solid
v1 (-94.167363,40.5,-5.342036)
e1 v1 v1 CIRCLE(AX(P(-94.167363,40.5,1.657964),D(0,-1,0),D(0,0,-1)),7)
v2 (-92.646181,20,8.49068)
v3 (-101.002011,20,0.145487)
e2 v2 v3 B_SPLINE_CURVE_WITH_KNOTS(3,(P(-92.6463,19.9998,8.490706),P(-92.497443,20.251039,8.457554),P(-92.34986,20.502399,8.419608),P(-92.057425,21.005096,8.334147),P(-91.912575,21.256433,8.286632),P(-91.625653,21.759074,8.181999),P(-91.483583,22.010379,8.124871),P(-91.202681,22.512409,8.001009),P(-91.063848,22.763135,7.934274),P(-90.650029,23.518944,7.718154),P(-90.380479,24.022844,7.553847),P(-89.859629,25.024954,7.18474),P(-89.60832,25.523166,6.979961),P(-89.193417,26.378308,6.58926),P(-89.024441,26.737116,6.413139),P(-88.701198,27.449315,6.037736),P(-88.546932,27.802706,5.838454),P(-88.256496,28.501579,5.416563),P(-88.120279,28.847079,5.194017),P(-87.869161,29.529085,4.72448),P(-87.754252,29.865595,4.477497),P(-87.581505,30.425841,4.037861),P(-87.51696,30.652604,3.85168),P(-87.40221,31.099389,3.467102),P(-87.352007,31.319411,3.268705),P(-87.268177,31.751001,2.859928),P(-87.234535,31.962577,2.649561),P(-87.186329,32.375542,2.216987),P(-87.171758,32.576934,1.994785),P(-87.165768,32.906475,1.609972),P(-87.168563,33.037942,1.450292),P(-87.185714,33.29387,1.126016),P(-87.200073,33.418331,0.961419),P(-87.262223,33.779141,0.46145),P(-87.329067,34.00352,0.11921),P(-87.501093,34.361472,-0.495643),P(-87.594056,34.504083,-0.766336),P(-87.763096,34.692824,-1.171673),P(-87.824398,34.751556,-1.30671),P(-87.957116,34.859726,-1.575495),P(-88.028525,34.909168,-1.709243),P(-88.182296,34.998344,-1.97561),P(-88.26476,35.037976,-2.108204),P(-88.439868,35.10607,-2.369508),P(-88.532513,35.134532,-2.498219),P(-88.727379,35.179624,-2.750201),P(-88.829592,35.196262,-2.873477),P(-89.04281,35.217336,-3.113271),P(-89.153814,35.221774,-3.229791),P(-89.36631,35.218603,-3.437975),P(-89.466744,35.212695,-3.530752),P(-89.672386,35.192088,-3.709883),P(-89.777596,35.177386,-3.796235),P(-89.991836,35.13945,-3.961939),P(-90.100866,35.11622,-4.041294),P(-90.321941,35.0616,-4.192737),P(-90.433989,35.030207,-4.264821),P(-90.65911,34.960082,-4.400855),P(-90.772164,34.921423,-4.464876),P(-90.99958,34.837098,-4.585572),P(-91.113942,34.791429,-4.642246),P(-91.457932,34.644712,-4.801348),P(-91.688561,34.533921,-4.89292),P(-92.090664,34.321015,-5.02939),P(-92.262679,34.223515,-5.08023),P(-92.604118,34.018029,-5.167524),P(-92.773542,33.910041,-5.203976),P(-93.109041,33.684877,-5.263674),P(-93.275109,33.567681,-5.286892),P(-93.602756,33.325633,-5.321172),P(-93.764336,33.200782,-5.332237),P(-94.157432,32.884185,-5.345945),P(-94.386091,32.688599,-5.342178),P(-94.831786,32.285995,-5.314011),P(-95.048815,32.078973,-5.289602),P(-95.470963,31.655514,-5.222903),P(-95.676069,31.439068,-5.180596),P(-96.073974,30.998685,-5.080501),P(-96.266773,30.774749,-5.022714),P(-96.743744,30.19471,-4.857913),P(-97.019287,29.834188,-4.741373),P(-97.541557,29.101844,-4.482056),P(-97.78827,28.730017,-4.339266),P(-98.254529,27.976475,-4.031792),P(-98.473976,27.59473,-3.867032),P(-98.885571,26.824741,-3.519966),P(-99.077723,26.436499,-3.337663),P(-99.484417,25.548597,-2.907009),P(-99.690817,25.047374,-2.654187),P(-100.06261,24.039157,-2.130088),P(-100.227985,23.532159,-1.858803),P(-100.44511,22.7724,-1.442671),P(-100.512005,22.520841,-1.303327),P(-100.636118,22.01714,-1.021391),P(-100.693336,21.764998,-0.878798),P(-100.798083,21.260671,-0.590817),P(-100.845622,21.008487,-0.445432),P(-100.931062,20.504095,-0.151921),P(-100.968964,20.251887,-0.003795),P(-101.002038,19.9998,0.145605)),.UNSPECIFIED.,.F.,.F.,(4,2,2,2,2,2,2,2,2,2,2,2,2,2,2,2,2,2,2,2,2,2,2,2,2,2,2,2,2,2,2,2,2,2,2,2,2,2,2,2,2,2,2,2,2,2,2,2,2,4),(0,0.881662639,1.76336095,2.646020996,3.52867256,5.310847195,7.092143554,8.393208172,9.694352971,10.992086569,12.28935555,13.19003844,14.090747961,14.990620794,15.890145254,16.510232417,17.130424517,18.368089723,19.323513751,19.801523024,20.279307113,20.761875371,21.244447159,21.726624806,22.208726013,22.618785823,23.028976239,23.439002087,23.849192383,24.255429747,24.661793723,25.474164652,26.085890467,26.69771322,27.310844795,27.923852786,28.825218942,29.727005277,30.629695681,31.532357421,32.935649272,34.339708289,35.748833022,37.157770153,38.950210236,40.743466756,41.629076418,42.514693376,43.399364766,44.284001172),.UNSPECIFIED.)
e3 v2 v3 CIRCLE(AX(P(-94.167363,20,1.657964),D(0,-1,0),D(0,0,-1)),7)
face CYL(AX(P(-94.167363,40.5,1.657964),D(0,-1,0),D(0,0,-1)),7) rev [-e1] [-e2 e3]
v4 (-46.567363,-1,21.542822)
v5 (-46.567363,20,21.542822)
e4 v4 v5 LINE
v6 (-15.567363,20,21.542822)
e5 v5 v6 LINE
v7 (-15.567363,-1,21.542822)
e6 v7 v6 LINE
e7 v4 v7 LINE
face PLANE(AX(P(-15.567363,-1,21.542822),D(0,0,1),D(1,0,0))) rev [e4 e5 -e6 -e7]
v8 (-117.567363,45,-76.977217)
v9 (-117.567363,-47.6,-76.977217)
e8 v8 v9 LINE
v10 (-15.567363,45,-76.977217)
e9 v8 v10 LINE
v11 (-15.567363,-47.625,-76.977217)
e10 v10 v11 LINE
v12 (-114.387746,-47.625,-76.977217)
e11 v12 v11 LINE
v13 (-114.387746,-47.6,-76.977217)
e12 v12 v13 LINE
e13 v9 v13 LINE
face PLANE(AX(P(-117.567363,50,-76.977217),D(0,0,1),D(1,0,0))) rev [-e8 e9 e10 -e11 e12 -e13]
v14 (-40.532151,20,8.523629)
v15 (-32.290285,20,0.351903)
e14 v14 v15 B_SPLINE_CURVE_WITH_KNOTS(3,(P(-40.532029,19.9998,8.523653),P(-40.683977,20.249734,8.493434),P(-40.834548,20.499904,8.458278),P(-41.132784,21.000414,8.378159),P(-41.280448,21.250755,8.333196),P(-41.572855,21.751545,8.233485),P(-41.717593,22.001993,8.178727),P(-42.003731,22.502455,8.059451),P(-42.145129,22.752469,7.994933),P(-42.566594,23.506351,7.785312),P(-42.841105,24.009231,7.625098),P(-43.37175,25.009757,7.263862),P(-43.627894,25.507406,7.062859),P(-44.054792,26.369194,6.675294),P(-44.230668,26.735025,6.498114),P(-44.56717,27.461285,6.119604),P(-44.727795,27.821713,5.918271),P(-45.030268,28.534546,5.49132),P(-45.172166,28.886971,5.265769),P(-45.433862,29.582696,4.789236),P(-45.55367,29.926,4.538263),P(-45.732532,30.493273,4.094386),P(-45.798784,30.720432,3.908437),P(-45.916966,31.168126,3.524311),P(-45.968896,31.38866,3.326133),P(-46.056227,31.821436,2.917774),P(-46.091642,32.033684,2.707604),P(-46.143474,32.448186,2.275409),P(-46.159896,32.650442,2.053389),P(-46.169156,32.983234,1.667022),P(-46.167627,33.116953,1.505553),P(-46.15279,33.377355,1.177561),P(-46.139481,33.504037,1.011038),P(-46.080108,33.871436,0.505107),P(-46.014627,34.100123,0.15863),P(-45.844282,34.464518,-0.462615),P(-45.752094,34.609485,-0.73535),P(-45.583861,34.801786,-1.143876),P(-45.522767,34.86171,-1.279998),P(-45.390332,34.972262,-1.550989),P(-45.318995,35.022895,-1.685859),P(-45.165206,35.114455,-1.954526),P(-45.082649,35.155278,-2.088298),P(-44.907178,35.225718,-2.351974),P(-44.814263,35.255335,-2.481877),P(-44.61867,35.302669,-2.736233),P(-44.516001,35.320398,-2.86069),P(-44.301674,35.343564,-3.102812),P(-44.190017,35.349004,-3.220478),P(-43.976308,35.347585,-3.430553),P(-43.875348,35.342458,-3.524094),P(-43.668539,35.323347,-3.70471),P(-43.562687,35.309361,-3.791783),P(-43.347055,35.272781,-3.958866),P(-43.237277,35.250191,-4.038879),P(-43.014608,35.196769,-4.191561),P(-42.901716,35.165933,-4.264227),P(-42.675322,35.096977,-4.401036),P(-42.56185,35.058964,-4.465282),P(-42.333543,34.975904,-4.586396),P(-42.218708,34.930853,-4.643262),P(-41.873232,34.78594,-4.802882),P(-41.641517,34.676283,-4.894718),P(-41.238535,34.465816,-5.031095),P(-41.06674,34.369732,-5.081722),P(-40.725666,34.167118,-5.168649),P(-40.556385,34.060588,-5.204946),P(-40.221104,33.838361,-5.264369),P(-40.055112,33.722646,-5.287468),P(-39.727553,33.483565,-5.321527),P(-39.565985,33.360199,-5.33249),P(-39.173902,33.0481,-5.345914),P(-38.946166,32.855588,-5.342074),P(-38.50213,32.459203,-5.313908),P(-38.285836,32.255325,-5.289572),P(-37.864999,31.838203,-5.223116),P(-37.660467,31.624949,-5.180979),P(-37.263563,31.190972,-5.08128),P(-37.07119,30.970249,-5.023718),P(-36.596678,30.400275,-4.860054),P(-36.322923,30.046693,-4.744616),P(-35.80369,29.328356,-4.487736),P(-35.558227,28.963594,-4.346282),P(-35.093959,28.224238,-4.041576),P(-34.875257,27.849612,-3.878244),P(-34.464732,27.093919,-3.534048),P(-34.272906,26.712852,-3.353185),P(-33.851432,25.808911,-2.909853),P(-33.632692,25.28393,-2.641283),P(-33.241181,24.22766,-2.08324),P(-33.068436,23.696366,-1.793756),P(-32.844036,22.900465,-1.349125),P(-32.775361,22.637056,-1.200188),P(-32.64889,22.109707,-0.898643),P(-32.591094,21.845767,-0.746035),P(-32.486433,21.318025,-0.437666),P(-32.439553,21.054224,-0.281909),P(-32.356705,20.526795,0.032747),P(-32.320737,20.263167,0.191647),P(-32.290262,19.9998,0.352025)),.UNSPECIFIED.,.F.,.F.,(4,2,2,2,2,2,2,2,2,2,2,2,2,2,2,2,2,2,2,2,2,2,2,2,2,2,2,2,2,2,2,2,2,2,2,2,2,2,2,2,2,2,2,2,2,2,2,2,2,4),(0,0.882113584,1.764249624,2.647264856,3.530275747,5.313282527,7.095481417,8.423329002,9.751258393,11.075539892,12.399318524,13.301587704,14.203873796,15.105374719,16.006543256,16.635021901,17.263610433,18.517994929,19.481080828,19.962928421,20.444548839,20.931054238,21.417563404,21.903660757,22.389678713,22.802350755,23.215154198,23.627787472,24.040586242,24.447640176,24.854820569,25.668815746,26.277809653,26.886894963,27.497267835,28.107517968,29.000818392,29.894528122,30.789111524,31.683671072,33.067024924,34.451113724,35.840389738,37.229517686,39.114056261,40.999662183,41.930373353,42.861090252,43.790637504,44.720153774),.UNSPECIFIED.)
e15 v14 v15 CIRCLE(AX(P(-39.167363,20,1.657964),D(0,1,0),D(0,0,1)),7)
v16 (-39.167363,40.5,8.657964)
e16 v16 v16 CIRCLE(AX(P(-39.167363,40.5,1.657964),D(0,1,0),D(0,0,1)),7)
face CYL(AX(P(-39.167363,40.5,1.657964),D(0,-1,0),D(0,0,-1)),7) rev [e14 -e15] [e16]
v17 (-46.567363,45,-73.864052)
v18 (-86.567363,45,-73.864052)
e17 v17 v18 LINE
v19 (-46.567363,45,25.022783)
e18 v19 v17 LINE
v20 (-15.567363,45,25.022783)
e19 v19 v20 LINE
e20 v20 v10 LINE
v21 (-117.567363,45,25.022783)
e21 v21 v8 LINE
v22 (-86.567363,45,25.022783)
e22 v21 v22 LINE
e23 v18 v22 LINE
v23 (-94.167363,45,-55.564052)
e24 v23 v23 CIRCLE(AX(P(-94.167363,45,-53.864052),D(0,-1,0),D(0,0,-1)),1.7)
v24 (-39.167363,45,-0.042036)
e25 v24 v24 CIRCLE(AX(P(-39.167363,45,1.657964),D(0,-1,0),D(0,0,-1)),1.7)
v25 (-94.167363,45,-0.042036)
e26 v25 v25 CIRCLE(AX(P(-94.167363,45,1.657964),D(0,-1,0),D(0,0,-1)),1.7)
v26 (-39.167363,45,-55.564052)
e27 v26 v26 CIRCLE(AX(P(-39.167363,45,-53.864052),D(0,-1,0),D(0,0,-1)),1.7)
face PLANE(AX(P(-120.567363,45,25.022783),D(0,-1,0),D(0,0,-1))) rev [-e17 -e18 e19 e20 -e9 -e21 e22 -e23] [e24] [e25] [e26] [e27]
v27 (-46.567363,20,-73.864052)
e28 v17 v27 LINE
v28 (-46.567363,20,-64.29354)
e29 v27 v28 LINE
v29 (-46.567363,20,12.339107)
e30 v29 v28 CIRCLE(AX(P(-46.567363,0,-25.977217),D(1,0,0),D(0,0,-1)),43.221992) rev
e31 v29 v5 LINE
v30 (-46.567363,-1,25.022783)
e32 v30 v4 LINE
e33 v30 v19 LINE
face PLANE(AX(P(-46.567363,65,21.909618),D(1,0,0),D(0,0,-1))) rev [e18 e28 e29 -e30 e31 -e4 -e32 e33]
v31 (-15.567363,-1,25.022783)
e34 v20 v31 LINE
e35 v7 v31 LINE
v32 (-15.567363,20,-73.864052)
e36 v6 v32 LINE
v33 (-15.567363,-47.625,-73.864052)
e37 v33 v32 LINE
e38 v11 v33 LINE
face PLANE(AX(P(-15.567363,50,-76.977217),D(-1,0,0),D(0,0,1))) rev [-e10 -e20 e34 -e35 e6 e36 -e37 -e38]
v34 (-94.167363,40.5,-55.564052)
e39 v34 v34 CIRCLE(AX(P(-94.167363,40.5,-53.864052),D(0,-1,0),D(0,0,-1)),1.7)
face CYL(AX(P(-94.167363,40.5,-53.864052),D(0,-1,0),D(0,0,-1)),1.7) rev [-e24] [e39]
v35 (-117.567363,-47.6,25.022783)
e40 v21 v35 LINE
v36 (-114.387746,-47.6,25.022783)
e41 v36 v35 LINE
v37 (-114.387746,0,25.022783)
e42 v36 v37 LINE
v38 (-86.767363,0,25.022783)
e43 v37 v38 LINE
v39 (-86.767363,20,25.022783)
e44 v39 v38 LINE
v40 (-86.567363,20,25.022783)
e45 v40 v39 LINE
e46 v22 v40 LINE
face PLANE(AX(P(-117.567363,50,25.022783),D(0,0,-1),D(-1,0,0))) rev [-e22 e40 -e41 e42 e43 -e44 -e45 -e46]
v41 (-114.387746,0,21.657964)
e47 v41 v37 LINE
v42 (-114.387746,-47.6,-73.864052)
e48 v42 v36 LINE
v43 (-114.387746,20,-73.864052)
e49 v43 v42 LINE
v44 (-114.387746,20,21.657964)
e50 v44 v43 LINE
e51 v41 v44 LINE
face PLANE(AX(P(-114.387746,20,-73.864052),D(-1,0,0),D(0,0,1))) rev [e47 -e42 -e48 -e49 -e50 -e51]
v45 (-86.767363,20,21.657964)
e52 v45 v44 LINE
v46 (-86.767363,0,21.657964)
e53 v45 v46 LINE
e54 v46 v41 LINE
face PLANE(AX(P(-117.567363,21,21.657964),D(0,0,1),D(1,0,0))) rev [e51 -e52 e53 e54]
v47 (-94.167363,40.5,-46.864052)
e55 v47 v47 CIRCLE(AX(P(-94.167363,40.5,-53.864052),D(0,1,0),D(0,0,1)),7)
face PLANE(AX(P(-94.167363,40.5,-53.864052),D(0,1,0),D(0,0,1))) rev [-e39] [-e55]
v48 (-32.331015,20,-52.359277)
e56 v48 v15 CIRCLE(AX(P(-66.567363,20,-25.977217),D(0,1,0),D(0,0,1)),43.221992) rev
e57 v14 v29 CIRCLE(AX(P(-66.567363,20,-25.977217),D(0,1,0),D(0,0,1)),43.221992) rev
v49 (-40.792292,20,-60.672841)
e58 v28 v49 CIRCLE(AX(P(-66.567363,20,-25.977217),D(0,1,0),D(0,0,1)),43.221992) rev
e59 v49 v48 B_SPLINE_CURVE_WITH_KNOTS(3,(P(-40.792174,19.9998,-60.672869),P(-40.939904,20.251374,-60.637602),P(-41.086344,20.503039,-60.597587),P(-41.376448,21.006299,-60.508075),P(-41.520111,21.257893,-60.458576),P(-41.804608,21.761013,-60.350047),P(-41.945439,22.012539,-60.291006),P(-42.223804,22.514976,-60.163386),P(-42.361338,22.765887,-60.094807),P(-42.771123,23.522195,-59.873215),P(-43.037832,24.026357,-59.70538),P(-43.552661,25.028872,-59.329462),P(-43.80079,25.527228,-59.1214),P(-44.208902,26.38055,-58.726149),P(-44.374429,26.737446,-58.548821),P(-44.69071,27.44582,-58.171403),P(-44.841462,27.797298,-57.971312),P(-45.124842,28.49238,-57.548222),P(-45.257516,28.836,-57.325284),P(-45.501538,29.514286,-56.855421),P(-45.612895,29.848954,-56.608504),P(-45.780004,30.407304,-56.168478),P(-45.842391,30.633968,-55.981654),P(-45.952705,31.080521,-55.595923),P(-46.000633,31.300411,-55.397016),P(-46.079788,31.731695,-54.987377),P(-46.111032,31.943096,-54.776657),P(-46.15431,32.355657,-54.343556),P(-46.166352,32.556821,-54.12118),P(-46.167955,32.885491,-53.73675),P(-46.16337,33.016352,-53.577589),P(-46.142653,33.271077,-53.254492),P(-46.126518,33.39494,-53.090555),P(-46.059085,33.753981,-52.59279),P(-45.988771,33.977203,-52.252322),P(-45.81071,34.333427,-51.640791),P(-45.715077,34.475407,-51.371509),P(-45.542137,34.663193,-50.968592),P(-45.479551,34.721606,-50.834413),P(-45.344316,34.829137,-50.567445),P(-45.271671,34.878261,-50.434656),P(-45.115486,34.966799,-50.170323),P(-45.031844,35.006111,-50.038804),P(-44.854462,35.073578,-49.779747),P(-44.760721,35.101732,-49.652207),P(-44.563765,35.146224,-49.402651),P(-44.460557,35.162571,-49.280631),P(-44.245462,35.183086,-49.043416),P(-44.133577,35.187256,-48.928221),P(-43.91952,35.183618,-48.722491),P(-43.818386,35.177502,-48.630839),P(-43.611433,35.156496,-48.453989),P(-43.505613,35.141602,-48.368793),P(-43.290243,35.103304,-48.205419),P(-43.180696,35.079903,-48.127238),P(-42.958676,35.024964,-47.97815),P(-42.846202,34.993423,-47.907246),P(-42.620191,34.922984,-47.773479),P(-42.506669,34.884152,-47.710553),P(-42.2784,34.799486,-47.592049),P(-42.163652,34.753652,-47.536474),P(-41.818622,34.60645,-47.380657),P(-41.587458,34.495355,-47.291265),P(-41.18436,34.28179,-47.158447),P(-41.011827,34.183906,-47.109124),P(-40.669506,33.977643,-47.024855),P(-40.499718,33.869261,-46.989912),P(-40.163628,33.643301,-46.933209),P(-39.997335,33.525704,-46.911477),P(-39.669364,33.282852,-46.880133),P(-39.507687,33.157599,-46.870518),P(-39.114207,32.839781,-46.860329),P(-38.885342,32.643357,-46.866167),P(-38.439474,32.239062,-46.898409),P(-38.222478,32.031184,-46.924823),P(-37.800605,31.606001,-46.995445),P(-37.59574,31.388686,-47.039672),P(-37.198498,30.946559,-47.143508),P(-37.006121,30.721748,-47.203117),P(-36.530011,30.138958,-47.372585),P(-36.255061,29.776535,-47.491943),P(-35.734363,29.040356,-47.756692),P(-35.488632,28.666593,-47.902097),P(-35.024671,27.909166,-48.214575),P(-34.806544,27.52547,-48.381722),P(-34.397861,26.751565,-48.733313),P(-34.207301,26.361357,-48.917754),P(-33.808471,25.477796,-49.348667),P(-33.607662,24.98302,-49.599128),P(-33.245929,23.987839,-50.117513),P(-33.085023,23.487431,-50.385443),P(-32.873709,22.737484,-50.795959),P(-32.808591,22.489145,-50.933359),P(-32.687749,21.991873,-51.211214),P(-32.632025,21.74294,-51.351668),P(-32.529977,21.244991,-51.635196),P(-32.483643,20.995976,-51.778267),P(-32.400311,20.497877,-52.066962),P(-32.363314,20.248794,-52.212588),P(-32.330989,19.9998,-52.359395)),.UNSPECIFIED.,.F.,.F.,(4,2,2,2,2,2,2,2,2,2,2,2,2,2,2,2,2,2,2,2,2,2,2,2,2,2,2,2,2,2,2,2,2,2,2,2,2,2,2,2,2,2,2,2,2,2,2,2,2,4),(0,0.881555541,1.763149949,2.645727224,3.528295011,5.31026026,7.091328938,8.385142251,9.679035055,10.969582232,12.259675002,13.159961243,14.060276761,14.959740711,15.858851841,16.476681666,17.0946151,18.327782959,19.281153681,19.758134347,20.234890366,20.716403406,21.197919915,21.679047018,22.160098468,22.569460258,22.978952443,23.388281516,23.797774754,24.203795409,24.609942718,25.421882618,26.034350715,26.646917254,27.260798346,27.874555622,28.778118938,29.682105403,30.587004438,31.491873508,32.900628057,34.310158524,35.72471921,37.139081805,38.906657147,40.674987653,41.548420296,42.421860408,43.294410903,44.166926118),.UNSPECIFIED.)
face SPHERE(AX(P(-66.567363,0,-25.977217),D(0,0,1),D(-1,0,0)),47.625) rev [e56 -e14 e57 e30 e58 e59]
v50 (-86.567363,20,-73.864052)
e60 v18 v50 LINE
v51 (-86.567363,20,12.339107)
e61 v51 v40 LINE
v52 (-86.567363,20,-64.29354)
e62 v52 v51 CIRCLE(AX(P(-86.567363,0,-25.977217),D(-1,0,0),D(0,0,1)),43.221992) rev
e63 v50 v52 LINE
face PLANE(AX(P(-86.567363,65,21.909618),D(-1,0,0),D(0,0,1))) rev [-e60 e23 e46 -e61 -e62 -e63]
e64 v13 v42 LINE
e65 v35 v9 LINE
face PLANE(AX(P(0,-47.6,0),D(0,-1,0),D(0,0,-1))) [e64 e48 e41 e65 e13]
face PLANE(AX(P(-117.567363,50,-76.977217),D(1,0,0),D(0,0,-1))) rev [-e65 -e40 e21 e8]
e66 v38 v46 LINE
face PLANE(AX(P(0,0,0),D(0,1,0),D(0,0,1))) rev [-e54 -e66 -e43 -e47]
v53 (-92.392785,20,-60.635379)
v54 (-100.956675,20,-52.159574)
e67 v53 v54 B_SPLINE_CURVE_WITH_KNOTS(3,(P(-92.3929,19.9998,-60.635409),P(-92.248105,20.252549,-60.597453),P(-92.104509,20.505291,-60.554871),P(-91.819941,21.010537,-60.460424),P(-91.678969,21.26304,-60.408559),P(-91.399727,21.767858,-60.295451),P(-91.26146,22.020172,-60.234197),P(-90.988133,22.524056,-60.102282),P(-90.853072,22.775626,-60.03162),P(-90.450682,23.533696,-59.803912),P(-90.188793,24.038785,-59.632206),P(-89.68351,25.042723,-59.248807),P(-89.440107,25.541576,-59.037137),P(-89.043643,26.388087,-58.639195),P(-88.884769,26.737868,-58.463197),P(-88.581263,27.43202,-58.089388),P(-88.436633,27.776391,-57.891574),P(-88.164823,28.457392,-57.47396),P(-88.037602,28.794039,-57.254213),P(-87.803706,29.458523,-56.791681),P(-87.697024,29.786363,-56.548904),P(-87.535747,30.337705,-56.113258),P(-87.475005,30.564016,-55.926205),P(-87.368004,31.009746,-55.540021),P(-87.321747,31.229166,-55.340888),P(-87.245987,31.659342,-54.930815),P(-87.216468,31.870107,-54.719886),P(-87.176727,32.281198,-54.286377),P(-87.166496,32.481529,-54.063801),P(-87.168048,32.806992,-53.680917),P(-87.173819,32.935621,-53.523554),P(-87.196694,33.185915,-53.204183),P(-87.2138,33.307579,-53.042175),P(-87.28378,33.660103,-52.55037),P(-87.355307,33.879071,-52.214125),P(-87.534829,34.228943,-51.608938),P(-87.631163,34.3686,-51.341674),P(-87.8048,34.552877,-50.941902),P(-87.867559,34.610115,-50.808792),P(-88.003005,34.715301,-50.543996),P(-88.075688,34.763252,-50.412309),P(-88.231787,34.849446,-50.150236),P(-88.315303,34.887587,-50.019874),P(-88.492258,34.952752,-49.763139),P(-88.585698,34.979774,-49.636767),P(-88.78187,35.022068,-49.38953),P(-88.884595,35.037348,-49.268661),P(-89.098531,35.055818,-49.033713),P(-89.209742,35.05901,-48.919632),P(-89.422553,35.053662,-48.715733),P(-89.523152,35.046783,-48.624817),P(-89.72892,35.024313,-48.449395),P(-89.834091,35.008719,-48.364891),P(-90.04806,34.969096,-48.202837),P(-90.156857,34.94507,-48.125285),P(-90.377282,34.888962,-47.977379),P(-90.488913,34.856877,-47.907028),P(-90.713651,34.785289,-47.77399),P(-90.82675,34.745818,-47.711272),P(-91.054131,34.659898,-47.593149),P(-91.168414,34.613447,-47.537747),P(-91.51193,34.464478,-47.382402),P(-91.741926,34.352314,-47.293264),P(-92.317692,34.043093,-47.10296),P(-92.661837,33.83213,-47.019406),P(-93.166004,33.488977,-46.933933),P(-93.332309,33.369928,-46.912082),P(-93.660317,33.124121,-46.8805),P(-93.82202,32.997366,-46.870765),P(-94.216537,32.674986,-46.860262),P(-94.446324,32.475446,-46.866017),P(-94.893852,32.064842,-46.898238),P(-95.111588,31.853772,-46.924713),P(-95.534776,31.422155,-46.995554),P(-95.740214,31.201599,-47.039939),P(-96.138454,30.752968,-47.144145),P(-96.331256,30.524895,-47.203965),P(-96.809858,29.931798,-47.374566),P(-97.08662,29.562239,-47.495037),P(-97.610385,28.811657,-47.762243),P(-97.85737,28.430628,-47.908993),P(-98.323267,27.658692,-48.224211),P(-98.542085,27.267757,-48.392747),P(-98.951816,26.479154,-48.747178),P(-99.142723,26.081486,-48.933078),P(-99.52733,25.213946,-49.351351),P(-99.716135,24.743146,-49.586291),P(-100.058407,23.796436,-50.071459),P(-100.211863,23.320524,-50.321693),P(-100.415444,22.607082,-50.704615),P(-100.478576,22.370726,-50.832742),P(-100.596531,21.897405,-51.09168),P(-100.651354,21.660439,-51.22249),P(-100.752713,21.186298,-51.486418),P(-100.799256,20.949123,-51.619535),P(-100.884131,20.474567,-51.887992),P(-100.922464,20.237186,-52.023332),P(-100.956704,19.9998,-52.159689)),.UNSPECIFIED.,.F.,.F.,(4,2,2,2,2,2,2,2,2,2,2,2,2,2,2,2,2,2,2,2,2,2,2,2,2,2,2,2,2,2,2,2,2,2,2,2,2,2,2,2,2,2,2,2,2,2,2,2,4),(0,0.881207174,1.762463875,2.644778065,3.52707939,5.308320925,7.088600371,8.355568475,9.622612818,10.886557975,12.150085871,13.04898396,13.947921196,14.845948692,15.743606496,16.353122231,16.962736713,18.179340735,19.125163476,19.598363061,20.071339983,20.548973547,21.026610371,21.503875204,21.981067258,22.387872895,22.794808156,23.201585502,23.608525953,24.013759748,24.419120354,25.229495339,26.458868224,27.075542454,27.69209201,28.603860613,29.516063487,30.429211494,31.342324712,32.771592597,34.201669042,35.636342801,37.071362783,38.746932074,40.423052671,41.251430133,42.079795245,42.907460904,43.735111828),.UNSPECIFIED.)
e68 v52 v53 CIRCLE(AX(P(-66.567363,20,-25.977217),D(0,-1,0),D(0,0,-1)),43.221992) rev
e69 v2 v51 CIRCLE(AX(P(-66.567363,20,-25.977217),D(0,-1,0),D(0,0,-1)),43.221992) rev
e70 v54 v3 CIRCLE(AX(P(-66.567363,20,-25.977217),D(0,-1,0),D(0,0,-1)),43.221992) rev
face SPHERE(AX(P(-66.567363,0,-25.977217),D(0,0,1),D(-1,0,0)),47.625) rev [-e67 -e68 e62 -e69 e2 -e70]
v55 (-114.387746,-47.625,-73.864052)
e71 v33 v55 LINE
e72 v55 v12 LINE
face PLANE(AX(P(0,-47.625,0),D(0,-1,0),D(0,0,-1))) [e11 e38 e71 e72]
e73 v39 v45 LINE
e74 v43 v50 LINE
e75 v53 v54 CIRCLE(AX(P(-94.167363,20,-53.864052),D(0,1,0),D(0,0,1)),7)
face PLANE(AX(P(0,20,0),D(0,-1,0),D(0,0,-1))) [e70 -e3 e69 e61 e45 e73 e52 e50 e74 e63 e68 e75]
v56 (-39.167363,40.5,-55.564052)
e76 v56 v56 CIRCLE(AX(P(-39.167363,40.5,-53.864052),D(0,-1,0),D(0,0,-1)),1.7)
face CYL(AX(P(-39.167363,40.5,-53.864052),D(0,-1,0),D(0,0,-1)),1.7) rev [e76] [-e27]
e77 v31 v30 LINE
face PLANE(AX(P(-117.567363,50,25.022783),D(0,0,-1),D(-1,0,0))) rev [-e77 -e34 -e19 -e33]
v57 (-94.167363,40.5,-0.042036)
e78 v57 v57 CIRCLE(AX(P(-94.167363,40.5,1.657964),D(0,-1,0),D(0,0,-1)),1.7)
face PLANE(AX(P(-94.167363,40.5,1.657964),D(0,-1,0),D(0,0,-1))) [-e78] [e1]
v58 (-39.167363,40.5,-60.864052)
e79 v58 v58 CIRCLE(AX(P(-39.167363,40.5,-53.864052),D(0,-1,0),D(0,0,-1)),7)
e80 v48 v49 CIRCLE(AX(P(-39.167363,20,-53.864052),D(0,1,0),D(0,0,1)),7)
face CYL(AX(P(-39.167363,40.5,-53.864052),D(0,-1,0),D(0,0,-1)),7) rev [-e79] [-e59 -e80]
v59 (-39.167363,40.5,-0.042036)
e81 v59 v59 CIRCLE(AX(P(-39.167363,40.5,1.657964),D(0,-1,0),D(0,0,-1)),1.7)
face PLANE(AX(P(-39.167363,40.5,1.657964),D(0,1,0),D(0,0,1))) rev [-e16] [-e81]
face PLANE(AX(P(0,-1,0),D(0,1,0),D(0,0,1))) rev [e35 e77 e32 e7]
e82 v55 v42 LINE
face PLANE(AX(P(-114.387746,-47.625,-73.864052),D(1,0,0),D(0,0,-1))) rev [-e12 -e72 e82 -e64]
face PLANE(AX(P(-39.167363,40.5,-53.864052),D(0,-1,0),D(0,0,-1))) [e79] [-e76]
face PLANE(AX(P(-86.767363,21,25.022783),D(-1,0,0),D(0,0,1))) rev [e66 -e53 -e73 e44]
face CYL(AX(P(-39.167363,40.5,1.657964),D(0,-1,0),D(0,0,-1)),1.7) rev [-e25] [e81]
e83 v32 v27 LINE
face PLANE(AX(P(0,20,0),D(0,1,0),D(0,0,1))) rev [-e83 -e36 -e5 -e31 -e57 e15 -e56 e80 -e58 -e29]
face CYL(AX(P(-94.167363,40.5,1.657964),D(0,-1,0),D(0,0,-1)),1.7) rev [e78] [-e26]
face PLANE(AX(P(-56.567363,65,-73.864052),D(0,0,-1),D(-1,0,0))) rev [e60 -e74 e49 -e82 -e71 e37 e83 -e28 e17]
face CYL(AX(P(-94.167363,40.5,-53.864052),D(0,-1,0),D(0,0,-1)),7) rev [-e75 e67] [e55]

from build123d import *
from build123d.topology import SkipClean

# Parameters (mm, degrees)
SKETCH1_W                   = 102
SKETCH1_H                   = 102
BOSS_EXTRUDE1_DEPTH         = 50
CUT_EXTRUDE_THIN1_OUTLINE_W = 40
CUT_EXTRUDE_THIN1_OUTLINE_H = 95.773670058
CUT_EXTRUDE_THIN1_DEPTH     = 50
SKETCH4_W                   = 40
SKETCH4_H                   = 6.202657501
CUT_EXTRUDE3_DEPTH          = 54
SKETCH5_W                   = 33.817621941
SKETCH5_H                   = 102.594578927
CUT_EXTRUDE4_DEPTH          = 20
SKETCH6_W                   = 27.820383201
SKETCH6_H                   = 98.886835029
CUT_EXTRUDE5_DEPTH          = 20
SKETCH7_W                   = 30.8
SKETCH7_H                   = 3.364819678
BOSS_EXTRUDE2_DEPTH         = 21
SKETCH9_W                   = 31
SKETCH9_H                   = 3.479961613
BOSS_EXTRUDE4_DEPTH         = 21
SKETCH11_W                  = 98.820383201
SKETCH11_H                  = 3.113164971
BOSS_EXTRUDE6_DEPTH         = 47.625
SKETCH14_W                  = 102
SKETCH14_H                  = 5
CUT_EXTRUDE7_DEPTH          = 105
SKETCH17_R                  = 7
CUT_EXTRUDE12_DEPTH         = 20.5
M3_CLEARANCE_HOLE1_D        = 3.4
SKETCH22_W                  = 3.179616799
SKETCH22_H                  = 102
BOSS_EXTRUDE7_DEPTH         = 47.6


# Read off the part's stored shape, not the designer's step: Cut-Extrude-Thin1
with BuildPart() as part:
    # Sketch1 → Boss-Extrude1 (new body)
    with BuildSketch(Plane(origin=(0, 0, 0), x_dir=(1, 0, 0), z_dir=(0, 1, 0))):
        with Locations((-66.567363259, 25.977216604)):
            Rectangle(SKETCH1_W, SKETCH1_H)
    extrude(amount=BOSS_EXTRUDE1_DEPTH)

    # Sketch2 → Cut-Revolve1 (revolve, cut)
    with SkipClean():  # the faces are left unmerged after this step: merging them gives an invalid solid
        with BuildSketch(Plane(origin=(0, 0, 0), x_dir=(1, 0, 0), z_dir=(0, 1, 0))):
            with BuildLine():
                ThreePointArc((-66.567363259, 73.602216604), (-114.192363259, 25.977216604), (-66.567363259, -21.647783396))
                Line((-66.567363259, -21.647783396), (-66.567363259, 73.602216604))
            make_face()
            with BuildLine():
                Line((-66.567363259, 73.602216604), (-66.567363259, -21.647783396))
                ThreePointArc((-66.567363259, -21.647783396), (-32.891402805, -7.69874385), (-18.942363259, 25.977216604))
                ThreePointArc((-18.942363259, 25.977216604), (-32.891402805, 59.653177058), (-66.567363259, 73.602216604))
            make_face()
        revolve(axis=Axis((-66.567363259, 0, 21.647783396), (0, 0, -1)), mode=Mode.SUBTRACT)
    add(part.part.scale(1), mode=Mode.REPLACE)  # the faces are merged on a copy

    # Cut-Extrude-Thin1 outline → Cut-Extrude-Thin1 (cut)
    with BuildSketch(Plane(origin=(0, 0, 0), x_dir=(1, 0, 0), z_dir=(0, 1, 0))):
        with Locations((-66.567363259, 25.977216604)):
            Rectangle(CUT_EXTRUDE_THIN1_OUTLINE_W, CUT_EXTRUDE_THIN1_OUTLINE_H)
    extrude(amount=CUT_EXTRUDE_THIN1_DEPTH, mode=Mode.SUBTRACT)

    # Sketch4 → Cut-Extrude3 (cut)
    with BuildSketch(Plane(origin=(0, 0, 0), x_dir=(1, 0, 0), z_dir=(0, 1, 0))):
        with Locations((-66.567363259, -25.010947176)):
            Rectangle(SKETCH4_W, SKETCH4_H)
    extrude(amount=CUT_EXTRUDE3_DEPTH, mode=Mode.SUBTRACT)

    # Sketch5 → Cut-Extrude4 (cut)
    with BuildSketch(Plane(origin=(0, 0, 0), x_dir=(1, 0, 0), z_dir=(0, 1, 0))):
        with Locations((-29.658552289, 22.56676217)):
            Rectangle(SKETCH5_W, SKETCH5_H)
    extrude(amount=CUT_EXTRUDE4_DEPTH, mode=Mode.SUBTRACT)

    # Sketch6 → Cut-Extrude5 (cut)
    with BuildSketch(Plane(origin=(0, 0, 0), x_dir=(-1, 0, 0), z_dir=(0, -1, 0))):
        with Locations((100.47755486, 24.420634119)):
            Rectangle(SKETCH6_W, SKETCH6_H)
    extrude(amount=-CUT_EXTRUDE5_DEPTH, mode=Mode.SUBTRACT)

    # Sketch7 → Boss-Extrude2 (add)
    with BuildSketch(Plane(origin=(0, 0, 0), x_dir=(1, 0, 0), z_dir=(0, 1, 0))):
        with Locations((-102.167363259, -23.340373557)):
            Rectangle(SKETCH7_W, SKETCH7_H)
    extrude(amount=BOSS_EXTRUDE2_DEPTH)

    # Sketch9 → Boss-Extrude4 (add)
    with BuildSketch(Plane.XZ.offset(-20)):
        with Locations((-31.067363259, 23.28280259)):
            Rectangle(SKETCH9_W, SKETCH9_H)
    extrude(amount=BOSS_EXTRUDE4_DEPTH)

    # Sketch11 → Boss-Extrude6 (add)
    with BuildSketch(Plane.XZ):
        with Locations((-64.97755486, -75.420634119)):
            Rectangle(SKETCH11_W, SKETCH11_H)
    extrude(amount=BOSS_EXTRUDE6_DEPTH)

    # Sketch14 → Cut-Extrude7 (cut)
    with BuildSketch(Plane(origin=(-15.567363259, 0, 0), x_dir=(0, 0, -1), z_dir=(1, 0, 0))):
        with Locations((25.977216604, 47.5)):
            Rectangle(SKETCH14_W, SKETCH14_H)
    extrude(amount=-CUT_EXTRUDE7_DEPTH, mode=Mode.SUBTRACT)

    # Sketch17 → Cut-Extrude12 (cut)
    with BuildSketch(Plane.XZ.offset(-20)):
        with Locations(Location((-94.167363259, 1.657963718, 0), (0, 0, 270))):
            Circle(SKETCH17_R)
        with Locations(Location((-94.167363259, -53.864051633, 0), (0, 0, 284.685382437))):
            Circle(SKETCH17_R)
        with Locations(Location((-39.167363259, 1.657963718, 0), (0, 0, 349.246729183))):
            Circle(SKETCH17_R)
        with Locations(Location((-39.167363259, -53.864051633, 0), (0, 0, 270))):
            Circle(SKETCH17_R)
    extrude(amount=-CUT_EXTRUDE12_DEPTH, mode=Mode.SUBTRACT)

    # M3 Clearance Hole1 (through all)
    with Locations(Plane(origin=(0, 40.5, 0), x_dir=(-1, 0, 0), z_dir=(0, -1, 0))):
        with Locations((94.167363259, -1.657963718), (39.167363259, -1.657963718), (39.167363259, 53.864051633), (94.167363259, 53.864051633)):
            Hole(M3_CLEARANCE_HOLE1_D / 2)

    # Sketch22 → Boss-Extrude7 (add)
    with BuildSketch(Plane.XZ):
        with Locations((-115.97755486, -25.977216604)):
            Rectangle(SKETCH22_W, SKETCH22_H)
    extrude(amount=BOSS_EXTRUDE7_DEPTH)


solid = part.part
